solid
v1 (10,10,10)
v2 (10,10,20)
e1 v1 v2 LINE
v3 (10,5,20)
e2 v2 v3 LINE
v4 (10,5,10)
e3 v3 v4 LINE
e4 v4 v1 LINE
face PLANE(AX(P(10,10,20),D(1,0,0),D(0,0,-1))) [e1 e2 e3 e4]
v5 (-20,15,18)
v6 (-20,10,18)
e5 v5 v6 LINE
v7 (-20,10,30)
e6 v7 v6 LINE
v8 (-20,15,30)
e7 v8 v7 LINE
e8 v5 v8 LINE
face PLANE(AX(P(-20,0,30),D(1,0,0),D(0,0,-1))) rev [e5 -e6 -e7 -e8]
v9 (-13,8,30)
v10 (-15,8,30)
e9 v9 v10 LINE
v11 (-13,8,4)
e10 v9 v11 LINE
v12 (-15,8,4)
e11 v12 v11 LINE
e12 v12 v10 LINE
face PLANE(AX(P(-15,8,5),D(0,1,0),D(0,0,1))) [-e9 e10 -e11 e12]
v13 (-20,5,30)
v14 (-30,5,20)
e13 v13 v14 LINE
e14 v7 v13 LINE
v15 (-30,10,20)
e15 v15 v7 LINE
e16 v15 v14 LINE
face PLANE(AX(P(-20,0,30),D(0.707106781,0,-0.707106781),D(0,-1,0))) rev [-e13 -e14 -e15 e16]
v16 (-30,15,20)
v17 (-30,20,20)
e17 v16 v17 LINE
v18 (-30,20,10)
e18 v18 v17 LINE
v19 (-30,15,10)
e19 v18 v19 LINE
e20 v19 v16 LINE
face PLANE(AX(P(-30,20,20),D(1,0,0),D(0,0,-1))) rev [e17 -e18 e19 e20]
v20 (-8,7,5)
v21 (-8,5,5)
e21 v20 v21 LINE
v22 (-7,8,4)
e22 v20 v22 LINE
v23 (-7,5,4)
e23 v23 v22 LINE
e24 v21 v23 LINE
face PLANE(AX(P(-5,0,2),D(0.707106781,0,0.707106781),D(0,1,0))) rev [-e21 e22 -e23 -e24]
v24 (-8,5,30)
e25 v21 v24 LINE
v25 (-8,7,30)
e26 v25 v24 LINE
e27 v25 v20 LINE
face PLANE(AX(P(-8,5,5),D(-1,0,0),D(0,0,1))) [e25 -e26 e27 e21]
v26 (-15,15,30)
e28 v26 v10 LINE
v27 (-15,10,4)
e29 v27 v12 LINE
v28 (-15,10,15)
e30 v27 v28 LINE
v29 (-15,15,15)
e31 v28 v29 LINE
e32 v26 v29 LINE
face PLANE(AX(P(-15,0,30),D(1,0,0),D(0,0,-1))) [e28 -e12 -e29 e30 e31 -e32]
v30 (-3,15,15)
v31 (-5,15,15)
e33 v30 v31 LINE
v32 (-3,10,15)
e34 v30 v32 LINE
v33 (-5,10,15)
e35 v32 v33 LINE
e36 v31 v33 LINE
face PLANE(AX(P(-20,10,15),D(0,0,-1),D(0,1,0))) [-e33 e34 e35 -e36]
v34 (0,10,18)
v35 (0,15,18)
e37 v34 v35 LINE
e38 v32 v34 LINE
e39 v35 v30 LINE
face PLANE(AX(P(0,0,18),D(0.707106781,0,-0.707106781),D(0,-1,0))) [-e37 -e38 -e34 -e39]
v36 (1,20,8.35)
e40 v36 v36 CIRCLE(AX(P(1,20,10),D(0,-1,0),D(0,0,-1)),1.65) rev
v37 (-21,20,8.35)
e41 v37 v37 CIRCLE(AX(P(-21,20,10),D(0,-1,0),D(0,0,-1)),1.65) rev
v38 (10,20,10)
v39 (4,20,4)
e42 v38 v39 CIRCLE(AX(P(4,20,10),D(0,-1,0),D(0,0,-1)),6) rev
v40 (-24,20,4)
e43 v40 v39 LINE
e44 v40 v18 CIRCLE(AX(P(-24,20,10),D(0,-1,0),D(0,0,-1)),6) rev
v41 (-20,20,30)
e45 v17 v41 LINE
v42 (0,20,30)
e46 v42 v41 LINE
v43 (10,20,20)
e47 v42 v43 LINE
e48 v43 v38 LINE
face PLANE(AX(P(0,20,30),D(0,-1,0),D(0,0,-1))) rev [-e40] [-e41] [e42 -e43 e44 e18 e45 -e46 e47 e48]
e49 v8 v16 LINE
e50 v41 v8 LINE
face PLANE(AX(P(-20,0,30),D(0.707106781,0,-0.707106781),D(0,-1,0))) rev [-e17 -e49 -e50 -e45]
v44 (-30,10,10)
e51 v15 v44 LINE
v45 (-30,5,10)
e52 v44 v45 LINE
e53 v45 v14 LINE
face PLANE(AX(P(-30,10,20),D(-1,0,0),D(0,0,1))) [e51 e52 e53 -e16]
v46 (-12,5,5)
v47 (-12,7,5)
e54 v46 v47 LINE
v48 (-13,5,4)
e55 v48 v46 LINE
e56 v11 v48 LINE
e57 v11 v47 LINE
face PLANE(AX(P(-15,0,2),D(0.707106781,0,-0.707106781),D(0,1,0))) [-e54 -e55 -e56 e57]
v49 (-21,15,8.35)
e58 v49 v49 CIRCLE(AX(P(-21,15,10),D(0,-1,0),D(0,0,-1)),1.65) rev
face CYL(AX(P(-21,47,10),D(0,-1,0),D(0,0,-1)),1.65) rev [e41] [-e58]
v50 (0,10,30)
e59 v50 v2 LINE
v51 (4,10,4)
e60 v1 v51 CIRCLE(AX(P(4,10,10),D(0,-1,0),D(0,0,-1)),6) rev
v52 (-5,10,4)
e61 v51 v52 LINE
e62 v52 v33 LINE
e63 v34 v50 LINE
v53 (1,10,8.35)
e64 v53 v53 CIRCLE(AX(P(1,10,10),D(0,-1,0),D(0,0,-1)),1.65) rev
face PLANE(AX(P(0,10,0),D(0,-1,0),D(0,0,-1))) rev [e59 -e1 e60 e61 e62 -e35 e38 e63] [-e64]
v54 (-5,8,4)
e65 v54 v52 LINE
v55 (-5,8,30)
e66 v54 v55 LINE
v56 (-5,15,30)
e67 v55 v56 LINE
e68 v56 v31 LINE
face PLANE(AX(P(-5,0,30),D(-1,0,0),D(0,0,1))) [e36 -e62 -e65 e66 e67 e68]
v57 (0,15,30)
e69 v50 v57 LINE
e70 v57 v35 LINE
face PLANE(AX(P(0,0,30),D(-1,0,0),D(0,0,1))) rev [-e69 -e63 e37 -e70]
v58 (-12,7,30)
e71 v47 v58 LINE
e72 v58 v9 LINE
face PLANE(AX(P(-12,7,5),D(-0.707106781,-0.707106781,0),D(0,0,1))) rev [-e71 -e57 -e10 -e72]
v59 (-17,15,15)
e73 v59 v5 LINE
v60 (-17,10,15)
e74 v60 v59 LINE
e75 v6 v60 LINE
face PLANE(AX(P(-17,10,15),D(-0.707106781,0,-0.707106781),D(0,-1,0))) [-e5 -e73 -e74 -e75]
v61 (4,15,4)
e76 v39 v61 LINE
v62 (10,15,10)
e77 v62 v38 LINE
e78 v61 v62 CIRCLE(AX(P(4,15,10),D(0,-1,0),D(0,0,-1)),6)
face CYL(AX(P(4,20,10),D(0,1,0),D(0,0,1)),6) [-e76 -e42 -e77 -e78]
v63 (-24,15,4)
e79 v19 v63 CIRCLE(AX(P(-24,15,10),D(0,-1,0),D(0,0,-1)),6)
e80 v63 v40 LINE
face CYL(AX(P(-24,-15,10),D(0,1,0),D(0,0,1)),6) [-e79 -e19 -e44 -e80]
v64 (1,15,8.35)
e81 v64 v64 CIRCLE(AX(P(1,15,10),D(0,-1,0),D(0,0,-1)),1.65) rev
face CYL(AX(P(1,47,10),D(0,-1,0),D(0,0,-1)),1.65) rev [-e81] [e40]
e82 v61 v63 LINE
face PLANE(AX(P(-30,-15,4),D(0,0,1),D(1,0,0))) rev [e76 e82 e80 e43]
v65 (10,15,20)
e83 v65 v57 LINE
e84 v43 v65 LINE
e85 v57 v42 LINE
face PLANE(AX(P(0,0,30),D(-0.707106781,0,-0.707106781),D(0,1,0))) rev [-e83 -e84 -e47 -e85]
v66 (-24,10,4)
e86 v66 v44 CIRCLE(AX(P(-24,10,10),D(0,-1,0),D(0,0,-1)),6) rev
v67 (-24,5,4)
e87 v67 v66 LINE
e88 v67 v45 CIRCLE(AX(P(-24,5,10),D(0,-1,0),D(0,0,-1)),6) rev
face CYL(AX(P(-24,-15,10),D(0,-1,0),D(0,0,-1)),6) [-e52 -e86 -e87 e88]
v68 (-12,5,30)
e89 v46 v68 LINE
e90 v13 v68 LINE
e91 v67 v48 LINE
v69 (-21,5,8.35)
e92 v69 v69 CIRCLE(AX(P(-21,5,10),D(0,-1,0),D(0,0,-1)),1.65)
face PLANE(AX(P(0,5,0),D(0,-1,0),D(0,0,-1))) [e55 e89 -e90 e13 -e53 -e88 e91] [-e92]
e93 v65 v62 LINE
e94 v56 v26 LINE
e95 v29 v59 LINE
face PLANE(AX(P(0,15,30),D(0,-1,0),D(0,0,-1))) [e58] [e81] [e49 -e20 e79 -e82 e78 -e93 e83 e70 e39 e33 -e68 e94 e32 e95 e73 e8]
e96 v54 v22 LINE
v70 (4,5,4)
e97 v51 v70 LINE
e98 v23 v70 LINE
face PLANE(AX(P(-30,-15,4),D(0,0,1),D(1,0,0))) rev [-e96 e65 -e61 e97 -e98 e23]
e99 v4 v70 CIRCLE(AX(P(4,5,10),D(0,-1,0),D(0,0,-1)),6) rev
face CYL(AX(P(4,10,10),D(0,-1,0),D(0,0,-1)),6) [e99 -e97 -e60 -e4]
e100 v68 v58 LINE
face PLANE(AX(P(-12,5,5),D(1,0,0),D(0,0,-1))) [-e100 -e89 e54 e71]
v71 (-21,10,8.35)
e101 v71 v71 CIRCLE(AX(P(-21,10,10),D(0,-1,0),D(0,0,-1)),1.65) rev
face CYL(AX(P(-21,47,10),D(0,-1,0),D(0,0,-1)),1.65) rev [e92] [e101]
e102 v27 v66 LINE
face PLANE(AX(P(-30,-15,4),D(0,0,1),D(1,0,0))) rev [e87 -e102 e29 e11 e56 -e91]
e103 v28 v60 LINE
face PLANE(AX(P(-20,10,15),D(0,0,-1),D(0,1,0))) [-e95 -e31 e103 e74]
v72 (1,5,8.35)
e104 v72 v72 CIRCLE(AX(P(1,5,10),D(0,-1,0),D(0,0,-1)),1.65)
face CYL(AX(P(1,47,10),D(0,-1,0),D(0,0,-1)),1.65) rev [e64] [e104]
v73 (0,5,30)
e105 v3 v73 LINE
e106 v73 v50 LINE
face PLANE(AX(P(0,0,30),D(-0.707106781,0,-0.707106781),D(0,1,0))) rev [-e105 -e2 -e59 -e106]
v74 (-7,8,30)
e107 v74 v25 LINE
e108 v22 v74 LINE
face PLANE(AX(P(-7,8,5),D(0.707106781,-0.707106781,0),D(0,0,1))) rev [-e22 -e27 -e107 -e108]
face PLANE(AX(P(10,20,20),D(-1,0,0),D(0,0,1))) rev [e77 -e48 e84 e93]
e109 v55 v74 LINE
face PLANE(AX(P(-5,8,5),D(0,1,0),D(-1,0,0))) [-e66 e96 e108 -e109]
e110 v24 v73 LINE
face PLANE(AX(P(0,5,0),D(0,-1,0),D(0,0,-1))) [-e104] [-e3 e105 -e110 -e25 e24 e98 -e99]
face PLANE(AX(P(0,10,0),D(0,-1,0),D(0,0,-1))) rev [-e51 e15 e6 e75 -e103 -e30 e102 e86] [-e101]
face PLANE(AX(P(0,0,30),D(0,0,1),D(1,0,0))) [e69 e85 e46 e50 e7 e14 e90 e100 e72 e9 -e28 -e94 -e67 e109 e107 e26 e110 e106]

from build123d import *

# Parameters (mm, degrees)
SKETCH_1_W                = 20
SKETCH_1_H                = 20
SKETCH_1_W_2              = 10
SKETCH_1_H_2              = 10
EXTRUDE_1_DEPTH           = 30
EXTRUDE_1_2_DEPTH         = 20
EXTRUDE_1_2_DEPTH_BACK    = 40
SKETCH_2_W                = 20
SKETCH_2_H                = 20
SKETCH_5_W                = 20
SKETCH_5_H                = 10
CUT_EXTRUDE_1_DEPTH       = 35
SKETCH_6_R                = 1.5
CUT_EXTRUDE_2_DEPTH       = 35
SKETCH_7_W                = 10
SKETCH_7_H                = 10
CUT_EXTRUDE_3_DEPTH       = 35
SKETCH_8_W                = 20
SKETCH_8_H                = 20
CUT_EXTRUDE_4_DEPTH       = 23
SKETCH_10_W               = 20
SKETCH_10_H               = 20
CUT_EXTRUDE_5_DEPTH       = 5
CHAMFER_1_SIZE            = 10
SKETCH_12_W               = 20
SKETCH_12_H               = 15
CUT_EXTRUDE_6_DEPTH       = 5
SKETCH_13_W               = 10
SKETCH_13_H               = 20
CUT_EXTRUDE_7_DEPTH       = 5
SKETCH_14_W               = 40
SKETCH_14_H               = 20
EXTRUDE_4_DEPTH           = 10
SKETCH_15_W               = 10
SKETCH_15_H               = 5
CUT_EXTRUDE_8_DEPTH       = 37
CHAMFER_2_SIZE            = 10
CUT_EXTRUDE_9_DEPTH       = 37
CUT_EXTRUDE_9_DEPTH_BACK  = 10
SKETCH_16_R               = 1.65
SKETCH_18_W               = 40
SKETCH_18_H               = 4
CUT_EXTRUDE_10_DEPTH      = 35
SKETCH_19_W               = 10
SKETCH_19_H               = 8
EXTRUDE_5_DEPTH           = 10
SKETCH_20_R               = 1.5
CUT_EXTRUDE_11_DEPTH      = 30
FILLET_1_R                = 6
SKETCH_21_W               = 10
SKETCH_21_H               = 12
CUT_EXTRUDE_12_DEPTH      = 1
CUT_EXTRUDE_13_DEPTH      = 18
CUT_EXTRUDE_13_DEPTH_BACK = 5
SKETCH_23_W               = 60.486113846
SKETCH_23_H               = 38.876717581
SKETCH_24_W               = 3
SKETCH_24_H               = 3
EXTRUDE_6_DEPTH           = 25
CHAMFER_3_SIZE            = 3
CHAMFER_4_SIZE            = 1
CHAMFER_5_SIZE            = 3


# Some blends are built 0.0001 mm under size
with BuildPart() as part:
    # 草图1 → Extrude 1 (new body)
    with BuildSketch(Plane.XY):
        with Locations((-10, 10)):
            Rectangle(SKETCH_1_W, SKETCH_1_H)
        with Locations((-10, 10)):
            Rectangle(SKETCH_1_W_2, SKETCH_1_H_2, mode=Mode.SUBTRACT)
    extrude(amount=EXTRUDE_1_DEPTH)

    # 草图2 → Extrude 1 2 (add, two sides: drawn at the far end of the back side and taken through both)
    with BuildSketch(Plane(origin=(0, 0, 0), x_dir=(0, 0, -1), z_dir=(1, 0, 0)).offset(-EXTRUDE_1_2_DEPTH_BACK)):
        with Locations((-10, 20)):
            Rectangle(SKETCH_2_W, SKETCH_2_H)
    extrude(amount=EXTRUDE_1_2_DEPTH + EXTRUDE_1_2_DEPTH_BACK)

    # 草图5 → 切除-拉伸1 (cut)
    with BuildSketch(Plane.XY.offset(20)):
        with Locations((-30, 25)):
            Rectangle(SKETCH_5_W, SKETCH_5_H)
        with Locations((10, 25)):
            Rectangle(SKETCH_5_W, SKETCH_5_H)
    extrude(amount=-CUT_EXTRUDE_1_DEPTH, mode=Mode.SUBTRACT)

    # 草图6 → 切除-拉伸2 (cut)
    with BuildSketch(Plane(origin=(0, 30, 0), x_dir=(1, 0, 0), z_dir=(0, 1, 0))):
        with Locations(Location((-21, -10, 0), (0, 0, 311.810314896))):
            Circle(SKETCH_6_R)
        with Locations(Location((1, -10, 0), (0, 0, 228.189685104))):
            Circle(SKETCH_6_R)
    extrude(amount=-CUT_EXTRUDE_2_DEPTH, mode=Mode.SUBTRACT)

    # 草图7 → 切除-拉伸3 (cut)
    with BuildSketch(Plane.XY.offset(30)):
        with Locations((-10, 10)):
            Rectangle(SKETCH_7_W, SKETCH_7_H)
    extrude(amount=-CUT_EXTRUDE_3_DEPTH, mode=Mode.SUBTRACT)

    # 草图8 → 切除-拉伸4 (cut)
    with BuildSketch(Plane(origin=(0, 20, 0), x_dir=(1, 0, 0), z_dir=(0, 1, 0))):
        with Locations((-10, -10)):
            Rectangle(SKETCH_8_W, SKETCH_8_H)
    extrude(amount=CUT_EXTRUDE_4_DEPTH, mode=Mode.SUBTRACT)

    # 草图10 → 切除-拉伸5 (cut)
    with BuildSketch(Plane.XZ.offset(-10)):
        with Locations((-30, 10)):
            Rectangle(SKETCH_10_W, SKETCH_10_H)
        with Locations((10, 10)):
            Rectangle(SKETCH_10_W, SKETCH_10_H)
    extrude(amount=-CUT_EXTRUDE_5_DEPTH, mode=Mode.SUBTRACT)

    # 倒角1
    chamfer_1_edges = [part.edges().sort_by_distance(p)[0] for p in [
        (0, 17.5, 20),
        (-20, 17.5, 20),
    ]]
    chamfer(chamfer_1_edges, length=CHAMFER_1_SIZE - 0.0001)  # a hair under: the kernel refuses the full size

    # 草图12 → 切除-拉伸6 (cut)
    with BuildSketch(Plane.XZ.offset(-15)):
        with Locations((-10, 7.5)):
            Rectangle(SKETCH_12_W, SKETCH_12_H)
    extrude(amount=CUT_EXTRUDE_6_DEPTH, mode=Mode.SUBTRACT)

    # 草图13 → 切除-拉伸7 (cut)
    with BuildSketch(Plane.XZ.offset(-15)):
        with Locations((-35, 10)):
            Rectangle(SKETCH_13_W, SKETCH_13_H)
        with Locations((15, 10)):
            Rectangle(SKETCH_13_W, SKETCH_13_H)
    extrude(amount=-CUT_EXTRUDE_7_DEPTH, mode=Mode.SUBTRACT)

    # 草图14 → 凸台-拉伸4 (add)
    with BuildSketch(Plane.XZ):
        with Locations((-10, 10)):
            Rectangle(SKETCH_14_W, SKETCH_14_H)
    extrude(amount=-EXTRUDE_4_DEPTH)

    # 草图15 → 切除-拉伸8 (cut)
    with BuildSketch(Plane.XY.offset(30)):
        with Locations((-10, 7.5)):
            Rectangle(SKETCH_15_W, SKETCH_15_H)
    extrude(amount=-CUT_EXTRUDE_8_DEPTH, mode=Mode.SUBTRACT)

    # 倒角2
    chamfer_2_edges = [part.edges().sort_by_distance(p)[0] for p in [
        (0, 5, 20),
        (-20, 5, 20),
    ]]
    chamfer(chamfer_2_edges, length=CHAMFER_2_SIZE - 0.0001)  # a hair under: the kernel refuses the full size

    # 草图16 → 切除-拉伸9 (cut, two sides: drawn at the far end of the back side and taken through both)
    with BuildSketch(Plane(origin=(0, 10, 0), x_dir=(1, 0, 0), z_dir=(0, 1, 0)).offset(-CUT_EXTRUDE_9_DEPTH_BACK)):
        with Locations(Location((-21, -10, 0), (0, 0, 90))):
            Circle(SKETCH_16_R)
        with Locations(Location((1, -10, 0), (0, 0, 90))):
            Circle(SKETCH_16_R)
    extrude(amount=CUT_EXTRUDE_9_DEPTH + CUT_EXTRUDE_9_DEPTH_BACK, mode=Mode.SUBTRACT)

    # 草图18 → 切除-拉伸10 (cut)
    with BuildSketch(Plane(origin=(0, 20, 0), x_dir=(1, 0, 0), z_dir=(0, 1, 0))):
        with Locations((-10, -2)):
            Rectangle(SKETCH_18_W, SKETCH_18_H)
    extrude(amount=-CUT_EXTRUDE_10_DEPTH, mode=Mode.SUBTRACT)

    # 草图19 → 凸台-拉伸5 (add)
    with BuildSketch(Plane.XZ):
        with Locations((-10, 20)):
            Rectangle(SKETCH_19_W, SKETCH_19_H)
    extrude(amount=EXTRUDE_5_DEPTH)

    # 草图20 → 切除-拉伸11 (cut)
    with BuildSketch(Plane.ZY.offset(15)):
        with Locations((20, -3)):
            Circle(SKETCH_20_R)
    extrude(amount=-CUT_EXTRUDE_11_DEPTH, mode=Mode.SUBTRACT)

    # 圆角1
    fillet_1_edges = [part.edges().sort_by_distance(p)[0] for p in [
        (-30, 5, 4),
        (10, 5, 4),
        (-30, 17.5, 4),
        (10, 17.5, 4),
    ]]
    fillet(fillet_1_edges, radius=FILLET_1_R)

    # 草图21 → 切除-拉伸12 (cut)
    with BuildSketch(Plane.XZ):
        with Locations((-10, 10)):
            Rectangle(SKETCH_21_W, SKETCH_21_H)
    extrude(amount=-CUT_EXTRUDE_12_DEPTH, mode=Mode.SUBTRACT)

    # 草图23 → 切除-拉伸13 (cut, two sides: drawn at the far end of the back side and taken through both)
    with BuildSketch(Plane.XZ.offset(-CUT_EXTRUDE_13_DEPTH_BACK)):
        with Locations((-10.757338654, 16.810917803)):
            Rectangle(SKETCH_23_W, SKETCH_23_H)
    extrude(amount=CUT_EXTRUDE_13_DEPTH + CUT_EXTRUDE_13_DEPTH_BACK, mode=Mode.SUBTRACT)

    # 草图24 → 凸台-拉伸6 (add)
    with BuildSketch(Plane.XY.offset(30)):
        with Locations((-13.5, 6.5)):
            Rectangle(SKETCH_24_W, SKETCH_24_H)
        with Locations((-6.5, 6.5)):
            Rectangle(SKETCH_24_W, SKETCH_24_H)
    extrude(amount=-EXTRUDE_6_DEPTH)

    # 倒角3
    # the kernel refuses this chamfer: 3 mm, written as the material it adds along each edge
    with BuildSketch(Plane(origin=(-5, 8, 5), x_dir=(0.02749587661058649, 0, -0.9996219169112968), z_dir=(0, -1, 0))) as chamfer_3_piece_1_section:
        Polygon((CHAMFER_3_SIZE * 0.999621916911, -CHAMFER_3_SIZE * 0.0274958766106), (-CHAMFER_3_SIZE * 0.0274958766106, -CHAMFER_3_SIZE * 0.999621916911), (0, 0), align=None)
    chamfer_3_piece_1 = extrude(amount=3, mode=Mode.PRIVATE)
    chamfer_3_piece_1 = split(chamfer_3_piece_1, bisect_by=Plane(origin=(-6.280814641, 6.5, 4), z_dir=(0, 0, 1)), keep=Keep.TOP, mode=Mode.PRIVATE)
    chamfer_3_piece_1 = split(chamfer_3_piece_1, bisect_by=Plane(origin=(-8, 6.5, 4.572987798), z_dir=(1, 0, 0)), keep=Keep.TOP, mode=Mode.PRIVATE)
    add(chamfer_3_piece_1)
    with BuildSketch(Plane(origin=(-15, 8, 5), x_dir=(-0.027495876610586202, 0, -0.9996219169112968), z_dir=(0, -1, 0))) as chamfer_3_piece_2_section:
        Polygon((CHAMFER_3_SIZE * 0.999621916911, CHAMFER_3_SIZE * 0.0274958766106), (-CHAMFER_3_SIZE * 0.0274958766106, CHAMFER_3_SIZE * 0.999621916911), (0, 0), align=None)
    chamfer_3_piece_2 = extrude(amount=3, mode=Mode.PRIVATE)
    chamfer_3_piece_2 = split(chamfer_3_piece_2, bisect_by=Plane(origin=(-13.719185359, 6.5, 4), z_dir=(0, 0, 1)), keep=Keep.TOP, mode=Mode.PRIVATE)
    chamfer_3_piece_2 = split(chamfer_3_piece_2, bisect_by=Plane(origin=(-12, 6.5, 4.572987798), z_dir=(-1, 0, 0)), keep=Keep.TOP, mode=Mode.PRIVATE)
    add(chamfer_3_piece_2)

    # 倒角4
    chamfer_4_edges = [part.edges().sort_by_distance(p)[0] for p in [
        (-12, 8, 17.5),
        (-8, 8, 17.5),
    ]]
    chamfer(chamfer_4_edges, length=CHAMFER_4_SIZE)

    # 倒角5
    chamfer_5_edges = [part.edges().sort_by_distance(p)[0] for p in [
        (0, 12.5, 15),
        (-20, 12.5, 15),
    ]]
    chamfer(chamfer_5_edges, length=CHAMFER_5_SIZE)


solid = part.part
